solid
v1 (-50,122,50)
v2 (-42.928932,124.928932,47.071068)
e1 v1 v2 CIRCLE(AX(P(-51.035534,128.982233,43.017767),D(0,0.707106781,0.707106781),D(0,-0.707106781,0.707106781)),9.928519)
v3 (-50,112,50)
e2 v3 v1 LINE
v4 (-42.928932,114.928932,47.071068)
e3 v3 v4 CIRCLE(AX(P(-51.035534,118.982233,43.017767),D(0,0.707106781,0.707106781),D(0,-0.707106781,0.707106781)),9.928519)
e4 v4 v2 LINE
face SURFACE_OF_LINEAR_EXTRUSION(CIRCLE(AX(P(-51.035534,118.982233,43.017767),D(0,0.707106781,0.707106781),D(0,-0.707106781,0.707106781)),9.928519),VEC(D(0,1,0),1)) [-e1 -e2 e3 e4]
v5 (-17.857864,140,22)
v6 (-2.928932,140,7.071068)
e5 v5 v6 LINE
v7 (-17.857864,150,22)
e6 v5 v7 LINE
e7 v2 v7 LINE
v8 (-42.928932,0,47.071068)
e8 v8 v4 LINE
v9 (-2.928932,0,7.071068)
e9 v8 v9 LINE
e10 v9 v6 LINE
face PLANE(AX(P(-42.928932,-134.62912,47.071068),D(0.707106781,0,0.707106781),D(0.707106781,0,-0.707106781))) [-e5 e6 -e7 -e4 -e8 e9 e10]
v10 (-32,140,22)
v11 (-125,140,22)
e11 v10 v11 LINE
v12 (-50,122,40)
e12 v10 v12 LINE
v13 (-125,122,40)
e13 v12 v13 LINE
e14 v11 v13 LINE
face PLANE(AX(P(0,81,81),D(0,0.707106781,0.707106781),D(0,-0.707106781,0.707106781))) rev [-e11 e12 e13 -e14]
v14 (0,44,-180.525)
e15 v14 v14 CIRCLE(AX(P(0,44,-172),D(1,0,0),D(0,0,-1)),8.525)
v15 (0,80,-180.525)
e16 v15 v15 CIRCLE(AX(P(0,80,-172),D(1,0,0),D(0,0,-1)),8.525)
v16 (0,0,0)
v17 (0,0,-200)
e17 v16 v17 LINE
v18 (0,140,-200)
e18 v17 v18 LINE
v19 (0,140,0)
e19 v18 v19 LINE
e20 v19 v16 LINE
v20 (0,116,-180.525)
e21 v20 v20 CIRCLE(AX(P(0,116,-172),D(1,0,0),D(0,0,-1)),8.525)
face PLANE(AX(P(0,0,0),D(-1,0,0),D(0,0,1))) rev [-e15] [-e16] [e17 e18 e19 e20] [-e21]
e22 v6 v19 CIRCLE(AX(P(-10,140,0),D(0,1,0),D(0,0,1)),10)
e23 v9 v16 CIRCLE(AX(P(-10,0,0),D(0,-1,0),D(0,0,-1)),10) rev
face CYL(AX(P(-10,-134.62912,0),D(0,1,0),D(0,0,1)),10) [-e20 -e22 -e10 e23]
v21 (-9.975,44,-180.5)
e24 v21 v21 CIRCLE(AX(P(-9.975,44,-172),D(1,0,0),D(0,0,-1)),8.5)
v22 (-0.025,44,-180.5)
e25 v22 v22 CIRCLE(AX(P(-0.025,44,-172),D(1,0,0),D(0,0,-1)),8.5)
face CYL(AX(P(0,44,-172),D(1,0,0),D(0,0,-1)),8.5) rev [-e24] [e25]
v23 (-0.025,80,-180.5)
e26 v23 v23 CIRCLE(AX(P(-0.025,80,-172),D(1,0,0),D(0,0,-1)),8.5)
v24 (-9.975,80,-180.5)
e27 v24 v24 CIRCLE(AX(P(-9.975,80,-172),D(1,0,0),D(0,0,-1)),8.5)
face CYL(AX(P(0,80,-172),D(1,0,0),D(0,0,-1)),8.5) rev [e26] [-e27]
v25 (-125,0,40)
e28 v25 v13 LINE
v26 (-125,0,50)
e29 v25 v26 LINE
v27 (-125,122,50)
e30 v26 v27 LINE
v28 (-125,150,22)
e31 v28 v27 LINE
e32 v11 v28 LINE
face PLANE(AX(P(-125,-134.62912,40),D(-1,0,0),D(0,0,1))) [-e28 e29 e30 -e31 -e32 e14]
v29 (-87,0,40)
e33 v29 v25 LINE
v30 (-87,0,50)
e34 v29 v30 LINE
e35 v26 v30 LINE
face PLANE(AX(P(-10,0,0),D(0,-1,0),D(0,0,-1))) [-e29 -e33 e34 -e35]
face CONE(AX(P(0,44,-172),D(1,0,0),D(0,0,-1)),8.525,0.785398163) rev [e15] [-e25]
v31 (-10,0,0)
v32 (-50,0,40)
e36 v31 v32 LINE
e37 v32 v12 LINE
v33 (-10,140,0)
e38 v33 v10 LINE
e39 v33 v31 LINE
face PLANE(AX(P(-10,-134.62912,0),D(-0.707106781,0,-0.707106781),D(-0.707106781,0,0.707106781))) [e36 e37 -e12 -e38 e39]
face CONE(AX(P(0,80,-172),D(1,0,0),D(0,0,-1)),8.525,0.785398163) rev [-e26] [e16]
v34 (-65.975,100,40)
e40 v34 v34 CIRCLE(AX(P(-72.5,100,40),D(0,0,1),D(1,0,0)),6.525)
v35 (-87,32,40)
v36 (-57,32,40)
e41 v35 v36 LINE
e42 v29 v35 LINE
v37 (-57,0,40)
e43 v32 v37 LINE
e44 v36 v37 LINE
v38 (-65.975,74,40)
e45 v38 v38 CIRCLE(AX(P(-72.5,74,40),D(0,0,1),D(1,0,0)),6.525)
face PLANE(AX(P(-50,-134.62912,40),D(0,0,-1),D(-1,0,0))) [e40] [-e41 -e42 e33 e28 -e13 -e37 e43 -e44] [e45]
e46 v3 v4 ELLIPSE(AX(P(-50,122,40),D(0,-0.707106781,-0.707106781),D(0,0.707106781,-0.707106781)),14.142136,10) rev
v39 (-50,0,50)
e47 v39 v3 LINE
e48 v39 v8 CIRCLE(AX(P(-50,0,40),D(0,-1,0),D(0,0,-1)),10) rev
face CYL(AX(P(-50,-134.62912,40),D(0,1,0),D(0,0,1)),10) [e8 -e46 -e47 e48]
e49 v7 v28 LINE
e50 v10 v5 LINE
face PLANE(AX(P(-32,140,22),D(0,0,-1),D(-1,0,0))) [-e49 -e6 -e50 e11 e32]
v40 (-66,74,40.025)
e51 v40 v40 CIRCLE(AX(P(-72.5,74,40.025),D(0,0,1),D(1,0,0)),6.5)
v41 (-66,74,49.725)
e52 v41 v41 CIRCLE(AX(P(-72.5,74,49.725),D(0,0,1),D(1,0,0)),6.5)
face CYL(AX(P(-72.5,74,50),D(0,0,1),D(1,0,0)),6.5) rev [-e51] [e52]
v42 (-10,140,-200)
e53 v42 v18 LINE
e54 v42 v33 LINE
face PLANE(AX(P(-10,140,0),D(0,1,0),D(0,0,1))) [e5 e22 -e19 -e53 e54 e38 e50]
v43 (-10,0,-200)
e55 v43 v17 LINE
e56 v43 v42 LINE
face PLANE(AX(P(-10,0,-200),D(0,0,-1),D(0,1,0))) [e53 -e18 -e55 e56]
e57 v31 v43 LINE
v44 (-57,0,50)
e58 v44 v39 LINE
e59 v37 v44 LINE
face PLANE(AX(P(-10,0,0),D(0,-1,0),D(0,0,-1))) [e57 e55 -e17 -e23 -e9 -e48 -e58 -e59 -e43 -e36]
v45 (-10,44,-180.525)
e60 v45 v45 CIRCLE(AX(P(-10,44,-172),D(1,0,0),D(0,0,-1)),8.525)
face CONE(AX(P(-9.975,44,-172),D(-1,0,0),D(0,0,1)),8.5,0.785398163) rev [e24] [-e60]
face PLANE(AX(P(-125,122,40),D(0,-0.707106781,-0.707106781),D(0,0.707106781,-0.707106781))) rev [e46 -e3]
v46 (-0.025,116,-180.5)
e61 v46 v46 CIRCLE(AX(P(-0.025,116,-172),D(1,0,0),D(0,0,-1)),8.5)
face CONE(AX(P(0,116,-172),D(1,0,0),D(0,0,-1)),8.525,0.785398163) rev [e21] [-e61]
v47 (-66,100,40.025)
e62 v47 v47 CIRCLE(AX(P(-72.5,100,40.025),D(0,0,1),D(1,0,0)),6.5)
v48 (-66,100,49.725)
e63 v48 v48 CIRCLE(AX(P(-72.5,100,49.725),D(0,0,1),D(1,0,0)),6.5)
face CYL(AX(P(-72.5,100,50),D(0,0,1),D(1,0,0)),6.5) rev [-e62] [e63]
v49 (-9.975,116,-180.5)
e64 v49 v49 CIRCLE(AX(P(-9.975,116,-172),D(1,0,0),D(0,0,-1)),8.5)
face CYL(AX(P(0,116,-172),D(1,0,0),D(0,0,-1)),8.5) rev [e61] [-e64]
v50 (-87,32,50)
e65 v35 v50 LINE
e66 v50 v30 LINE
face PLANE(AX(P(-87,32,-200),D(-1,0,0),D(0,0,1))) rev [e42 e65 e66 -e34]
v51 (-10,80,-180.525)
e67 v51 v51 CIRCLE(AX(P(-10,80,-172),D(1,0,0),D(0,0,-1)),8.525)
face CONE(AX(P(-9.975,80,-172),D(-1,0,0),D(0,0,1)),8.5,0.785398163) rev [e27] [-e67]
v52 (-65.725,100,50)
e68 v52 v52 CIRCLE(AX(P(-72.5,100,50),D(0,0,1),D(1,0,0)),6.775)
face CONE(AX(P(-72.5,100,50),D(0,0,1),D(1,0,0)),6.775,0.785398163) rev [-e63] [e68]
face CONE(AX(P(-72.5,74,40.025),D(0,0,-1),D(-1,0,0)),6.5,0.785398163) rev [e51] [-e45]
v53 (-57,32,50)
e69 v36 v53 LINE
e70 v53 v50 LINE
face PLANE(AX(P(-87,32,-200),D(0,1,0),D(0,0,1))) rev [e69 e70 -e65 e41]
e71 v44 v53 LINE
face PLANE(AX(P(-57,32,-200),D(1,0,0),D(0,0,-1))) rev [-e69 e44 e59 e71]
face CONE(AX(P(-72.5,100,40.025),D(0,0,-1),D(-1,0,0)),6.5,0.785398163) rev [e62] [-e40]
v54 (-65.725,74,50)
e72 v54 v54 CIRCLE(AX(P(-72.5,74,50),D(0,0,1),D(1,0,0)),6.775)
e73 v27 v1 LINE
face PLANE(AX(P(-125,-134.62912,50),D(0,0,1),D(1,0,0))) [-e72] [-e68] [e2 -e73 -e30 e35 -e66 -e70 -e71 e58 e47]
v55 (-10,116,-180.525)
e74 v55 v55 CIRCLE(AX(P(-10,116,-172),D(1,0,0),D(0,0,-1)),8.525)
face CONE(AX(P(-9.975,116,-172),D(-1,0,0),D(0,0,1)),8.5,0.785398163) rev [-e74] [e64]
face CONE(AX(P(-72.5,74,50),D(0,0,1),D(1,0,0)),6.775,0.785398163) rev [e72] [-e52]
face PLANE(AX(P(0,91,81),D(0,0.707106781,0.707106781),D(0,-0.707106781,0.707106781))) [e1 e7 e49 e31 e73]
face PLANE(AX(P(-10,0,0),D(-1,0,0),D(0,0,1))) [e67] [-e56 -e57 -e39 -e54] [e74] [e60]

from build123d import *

# Parameters (mm, degrees)
ESBO_O15_W                        = 200
ESBO_O15_H                        = 140
FLANGE_BASE3_DEPTH                = 10
RESSALTO_EXTRUS_O3_DEPTH          = 140
CORTE_EXTRUS_O1_DEPTH             = 275.271763038
ESBO_O29_W                        = 30
ESBO_O29_H                        = 32
CORTE_EXTRUS_O2_DEPTH             = 313.609980647
FURO_COM_FOLGA_DE_M121_AT_2_COUNT = 2
FURO_COM_FOLGA_DE_M121_AT_2_PITCH = 26
RESSALTO_EXTRUS_O4_DEPTH          = 10
FURO_COM_FOLGA_DE_M161_AT_2_COUNT = 2
FURO_COM_FOLGA_DE_M161_AT_2_PITCH = 36
FURO_COM_FOLGA_DE_M161_AT_3_COUNT = 2
FURO_COM_FOLGA_DE_M161_AT_3_PITCH = 72


# Sheet-metal steps are written as plain solids
with BuildPart() as part:
    # Esboço15 → Flange-base3 (new body)
    with BuildSketch(Plane(origin=(0, 0, 0), x_dir=(0, 0, -1), z_dir=(1, 0, 0))):
        with Locations((100, 70)):
            Rectangle(ESBO_O15_W, ESBO_O15_H)
    extrude(amount=-FLANGE_BASE3_DEPTH)

    # Esboço22 → Ressalto-extrusão3 (add)
    with BuildSketch(Plane(origin=(0, 140, 0), x_dir=(1, 0, 0), z_dir=(0, 1, 0))):
        with BuildLine():
            Line((-10, 0), (-50, -40))
            Line((-50, -40), (-125, -40))
            Line((-125, -40), (-125, -50))
            Line((-125, -50), (-50, -50))
            ThreePointArc((-50, -50), (-46.173165676, -49.238795325), (-42.928932188, -47.071067812))
            Line((-42.928932188, -47.071067812), (-2.928932188, -7.071067812))
            ThreePointArc((-2.928932188, -7.071067812), (-0.761204675, -3.826834324), (0, 0))
            Line((0, 0), (-10, 0))
        make_face()
    extrude(amount=-RESSALTO_EXTRUS_O3_DEPTH)

    # Esboço28 → Corte-extrusão1 (cut, through all)
    with BuildSketch(Plane(origin=(0, 0, 0), x_dir=(0, 0, -1), z_dir=(1, 0, 0))):
        Polygon((-40, 122), (-22, 140), (-40, 140), (-50, 140), (-50, 112), align=None)
    extrude(amount=-CORTE_EXTRUS_O1_DEPTH, mode=Mode.SUBTRACT)

    # Esboço29 → Corte-extrusão2 (cut, through all)
    with BuildSketch(Plane.XY.offset(50)):
        with Locations((-72, 16)):
            Rectangle(ESBO_O29_W, ESBO_O29_H)
    extrude(amount=-CORTE_EXTRUS_O2_DEPTH, mode=Mode.SUBTRACT)

    # Esboço32 → Furo com folga de M121 (revolve, cut)
    with BuildSketch(Plane(origin=(-72.5, 100, 50), x_dir=(0, -1, 0), z_dir=(1, 0, 0))):
        Polygon((0, 0), (0, 10), (6.525, 10), (6.5, 9.975), (6.5, 0.275), (6.775, 0), align=None)
    furo_com_folga_de_m121 = revolve(axis=Axis((-72.5, 100, 56.35), (0, 0, -1)), mode=Mode.SUBTRACT)

    # Furo com folga de M121 at 2: Furo com folga de M121 ×2
    with Locations(*[(0, -i * FURO_COM_FOLGA_DE_M121_AT_2_PITCH, 0) for i in range(1, FURO_COM_FOLGA_DE_M121_AT_2_COUNT)]):
        add(furo_com_folga_de_m121, mode=Mode.SUBTRACT)

    # 3DSketch1 → Ressalto-extrusão4 (add, along a direction that is not the sketch's normal)
    with BuildSketch(Plane(origin=(-32, 140, 22), x_dir=(-0.9200708084976427, -0.27701056599928864, 0.2770105659992915), z_dir=(0, -0.7071067811865503, -0.7071067811865448))):
        with BuildLine():
            Line((0, 0), (85.56658519, 36.43294524))
            Line((85.56658519, 36.43294524), (101.079176886, 0))
            Line((101.079176886, 0), (32.073866249, -29.381407452))
            ThreePointArc((32.073866249, -29.381407452), (27.897170232, -29.738711394), (23.945292844, -28.34045504))
            Line((23.945292844, -28.34045504), (-13.011766157, -5.54021132))
            Line((-13.011766157, -5.54021132), (0, 0))
        make_face()
    extrude(amount=-RESSALTO_EXTRUS_O4_DEPTH, dir=(0, -1, 0))

    # Esboço33 → Furo com folga de M161 (revolve, cut)
    with BuildSketch(Plane(origin=(0, 116, -172), x_dir=(0, 0, -1), z_dir=(0, 1, 0))):
        Polygon((0, 0), (0, 10), (8.525, 10), (8.5, 9.975), (8.5, 0.025), (8.525, 0), align=None)
    furo_com_folga_de_m161 = revolve(axis=Axis((6.35, 116, -172), (-1, 0, 0)), mode=Mode.SUBTRACT)

    # Furo com folga de M161 at 2: Furo com folga de M161 ×2
    with Locations(*[(0, -i * FURO_COM_FOLGA_DE_M161_AT_2_PITCH, 0) for i in range(1, FURO_COM_FOLGA_DE_M161_AT_2_COUNT)]):
        add(furo_com_folga_de_m161, mode=Mode.SUBTRACT)

    # Furo com folga de M161 at 3: Furo com folga de M161 ×2
    with Locations(*[(0, -i * FURO_COM_FOLGA_DE_M161_AT_3_PITCH, 0) for i in range(1, FURO_COM_FOLGA_DE_M161_AT_3_COUNT)]):
        add(furo_com_folga_de_m161, mode=Mode.SUBTRACT)


solid = part.part
